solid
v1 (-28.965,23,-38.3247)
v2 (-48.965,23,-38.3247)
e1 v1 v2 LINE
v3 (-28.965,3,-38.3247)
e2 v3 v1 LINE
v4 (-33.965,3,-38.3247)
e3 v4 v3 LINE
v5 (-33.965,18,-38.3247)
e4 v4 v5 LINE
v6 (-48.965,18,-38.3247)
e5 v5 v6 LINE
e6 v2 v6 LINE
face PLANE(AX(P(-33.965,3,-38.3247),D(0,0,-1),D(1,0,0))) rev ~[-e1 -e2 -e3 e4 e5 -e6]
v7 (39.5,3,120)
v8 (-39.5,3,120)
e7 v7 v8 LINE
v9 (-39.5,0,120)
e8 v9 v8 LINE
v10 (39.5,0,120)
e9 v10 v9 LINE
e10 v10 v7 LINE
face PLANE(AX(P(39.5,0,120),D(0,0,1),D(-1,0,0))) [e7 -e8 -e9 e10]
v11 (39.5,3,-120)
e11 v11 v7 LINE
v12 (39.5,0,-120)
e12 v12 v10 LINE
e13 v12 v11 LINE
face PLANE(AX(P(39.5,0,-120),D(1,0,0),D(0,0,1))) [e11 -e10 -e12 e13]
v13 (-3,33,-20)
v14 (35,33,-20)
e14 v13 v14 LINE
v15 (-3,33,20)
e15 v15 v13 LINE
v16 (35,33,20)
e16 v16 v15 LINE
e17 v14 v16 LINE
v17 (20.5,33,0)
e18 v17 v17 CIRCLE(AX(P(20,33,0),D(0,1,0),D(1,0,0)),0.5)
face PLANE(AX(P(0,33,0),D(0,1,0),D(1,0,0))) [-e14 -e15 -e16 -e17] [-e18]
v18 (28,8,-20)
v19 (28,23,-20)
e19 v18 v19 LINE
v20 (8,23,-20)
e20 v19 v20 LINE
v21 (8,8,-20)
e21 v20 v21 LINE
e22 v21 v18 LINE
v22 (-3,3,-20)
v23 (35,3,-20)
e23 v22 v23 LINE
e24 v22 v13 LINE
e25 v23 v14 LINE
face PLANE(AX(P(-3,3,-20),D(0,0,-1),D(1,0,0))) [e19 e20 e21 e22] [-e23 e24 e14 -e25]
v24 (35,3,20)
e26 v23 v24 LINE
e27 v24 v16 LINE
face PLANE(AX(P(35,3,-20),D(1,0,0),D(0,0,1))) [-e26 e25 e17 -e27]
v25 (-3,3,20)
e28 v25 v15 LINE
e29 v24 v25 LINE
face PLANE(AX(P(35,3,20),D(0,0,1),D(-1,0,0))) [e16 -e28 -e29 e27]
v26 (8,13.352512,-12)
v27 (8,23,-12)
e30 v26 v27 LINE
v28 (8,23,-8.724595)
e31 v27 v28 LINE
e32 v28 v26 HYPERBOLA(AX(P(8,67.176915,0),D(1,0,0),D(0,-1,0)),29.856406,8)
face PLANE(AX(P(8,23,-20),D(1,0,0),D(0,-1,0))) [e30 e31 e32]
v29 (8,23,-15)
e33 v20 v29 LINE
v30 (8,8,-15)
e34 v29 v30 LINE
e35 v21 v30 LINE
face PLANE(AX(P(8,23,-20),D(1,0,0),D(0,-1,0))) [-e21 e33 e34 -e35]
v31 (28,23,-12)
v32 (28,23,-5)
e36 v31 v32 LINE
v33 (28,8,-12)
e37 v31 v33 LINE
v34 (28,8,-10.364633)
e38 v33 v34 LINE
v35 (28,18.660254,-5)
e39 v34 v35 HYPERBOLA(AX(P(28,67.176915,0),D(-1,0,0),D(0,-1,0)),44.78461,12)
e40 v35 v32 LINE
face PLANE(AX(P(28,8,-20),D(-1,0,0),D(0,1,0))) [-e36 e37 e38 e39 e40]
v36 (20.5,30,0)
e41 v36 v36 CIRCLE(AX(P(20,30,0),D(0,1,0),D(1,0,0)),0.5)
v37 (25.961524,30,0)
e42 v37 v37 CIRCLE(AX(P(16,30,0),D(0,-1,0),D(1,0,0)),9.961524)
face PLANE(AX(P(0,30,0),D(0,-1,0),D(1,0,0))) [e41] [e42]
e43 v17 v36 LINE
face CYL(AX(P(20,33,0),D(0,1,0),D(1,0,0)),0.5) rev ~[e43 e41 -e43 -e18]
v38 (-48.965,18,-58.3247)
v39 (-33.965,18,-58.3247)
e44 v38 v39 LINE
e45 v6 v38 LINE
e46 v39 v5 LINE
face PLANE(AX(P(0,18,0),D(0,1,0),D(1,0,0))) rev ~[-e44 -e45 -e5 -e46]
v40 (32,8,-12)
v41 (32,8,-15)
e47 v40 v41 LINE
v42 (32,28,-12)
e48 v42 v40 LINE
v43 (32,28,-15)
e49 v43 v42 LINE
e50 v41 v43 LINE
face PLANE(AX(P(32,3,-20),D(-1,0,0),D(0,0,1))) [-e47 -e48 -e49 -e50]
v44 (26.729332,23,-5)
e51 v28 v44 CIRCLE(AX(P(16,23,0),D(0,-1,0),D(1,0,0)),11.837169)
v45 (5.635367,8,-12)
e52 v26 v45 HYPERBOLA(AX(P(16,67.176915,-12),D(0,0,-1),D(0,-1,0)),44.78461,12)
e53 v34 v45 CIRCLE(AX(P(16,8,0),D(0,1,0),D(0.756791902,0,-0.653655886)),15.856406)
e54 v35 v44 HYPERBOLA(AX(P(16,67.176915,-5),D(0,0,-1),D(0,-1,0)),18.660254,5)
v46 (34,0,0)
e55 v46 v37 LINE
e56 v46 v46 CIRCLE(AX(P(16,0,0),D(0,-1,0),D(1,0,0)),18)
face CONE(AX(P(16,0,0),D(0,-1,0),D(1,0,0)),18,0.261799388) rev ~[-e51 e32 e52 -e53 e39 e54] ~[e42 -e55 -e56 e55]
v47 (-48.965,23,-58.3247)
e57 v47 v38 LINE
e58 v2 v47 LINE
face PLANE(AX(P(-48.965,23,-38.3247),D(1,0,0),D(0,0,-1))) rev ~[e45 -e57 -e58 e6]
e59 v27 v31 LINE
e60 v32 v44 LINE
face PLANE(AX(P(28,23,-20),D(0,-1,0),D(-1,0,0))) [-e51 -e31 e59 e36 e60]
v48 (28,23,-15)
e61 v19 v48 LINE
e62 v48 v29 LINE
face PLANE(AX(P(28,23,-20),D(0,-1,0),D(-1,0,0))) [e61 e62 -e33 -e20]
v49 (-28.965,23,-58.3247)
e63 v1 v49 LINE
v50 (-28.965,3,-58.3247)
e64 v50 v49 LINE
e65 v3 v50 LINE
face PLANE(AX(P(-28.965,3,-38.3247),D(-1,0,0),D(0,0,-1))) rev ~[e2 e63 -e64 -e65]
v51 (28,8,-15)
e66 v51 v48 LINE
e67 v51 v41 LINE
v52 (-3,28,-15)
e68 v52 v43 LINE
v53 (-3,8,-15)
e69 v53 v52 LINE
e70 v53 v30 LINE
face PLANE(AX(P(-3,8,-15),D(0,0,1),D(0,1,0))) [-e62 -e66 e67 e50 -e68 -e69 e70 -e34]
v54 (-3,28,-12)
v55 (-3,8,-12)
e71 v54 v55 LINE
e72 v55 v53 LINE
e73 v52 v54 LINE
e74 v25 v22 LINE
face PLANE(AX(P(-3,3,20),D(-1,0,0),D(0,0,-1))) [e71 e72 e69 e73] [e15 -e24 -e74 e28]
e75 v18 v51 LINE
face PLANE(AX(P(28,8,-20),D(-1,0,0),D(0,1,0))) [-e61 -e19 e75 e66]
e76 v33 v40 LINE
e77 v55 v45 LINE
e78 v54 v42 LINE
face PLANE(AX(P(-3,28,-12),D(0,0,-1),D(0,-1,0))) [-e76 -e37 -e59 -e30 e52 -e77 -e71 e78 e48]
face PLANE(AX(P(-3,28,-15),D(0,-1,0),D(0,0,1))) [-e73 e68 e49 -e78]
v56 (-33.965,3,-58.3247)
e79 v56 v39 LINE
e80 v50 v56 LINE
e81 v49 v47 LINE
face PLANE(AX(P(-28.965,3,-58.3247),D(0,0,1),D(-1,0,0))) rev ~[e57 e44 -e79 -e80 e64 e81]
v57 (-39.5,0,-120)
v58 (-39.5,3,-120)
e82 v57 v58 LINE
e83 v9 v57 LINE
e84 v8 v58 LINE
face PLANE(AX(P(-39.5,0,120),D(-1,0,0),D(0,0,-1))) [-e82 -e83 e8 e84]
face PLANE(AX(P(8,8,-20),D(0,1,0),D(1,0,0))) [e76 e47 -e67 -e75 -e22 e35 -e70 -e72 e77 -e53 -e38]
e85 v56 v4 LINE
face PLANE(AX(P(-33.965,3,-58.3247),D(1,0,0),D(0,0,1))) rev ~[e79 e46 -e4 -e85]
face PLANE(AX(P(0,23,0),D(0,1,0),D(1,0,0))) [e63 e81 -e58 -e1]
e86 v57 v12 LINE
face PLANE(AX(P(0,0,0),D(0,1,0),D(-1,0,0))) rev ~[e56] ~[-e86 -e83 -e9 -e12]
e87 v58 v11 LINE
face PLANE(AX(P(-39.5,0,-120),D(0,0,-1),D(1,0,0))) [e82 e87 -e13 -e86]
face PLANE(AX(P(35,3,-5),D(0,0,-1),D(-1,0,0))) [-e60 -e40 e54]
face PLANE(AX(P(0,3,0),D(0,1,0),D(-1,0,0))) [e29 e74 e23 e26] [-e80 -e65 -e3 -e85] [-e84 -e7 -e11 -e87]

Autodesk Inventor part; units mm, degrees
ref_plane "YZ Plane" through (0, 0, 0) normal (1, 0, 0) x (0, 1, 0)
ref_plane "XZ Plane" through (0, 0, 0) normal (0, 1, 0) x (-1, 0, 0)
ref_plane "XY Plane" through (0, 0, 0) normal (0, 0, 1) x (1, 0, 0)
sketch "Sketch44" plane through (0, 0, 0) normal (0, 1, 0) x (-1, 0, 0)
  line L0 (-39.5, 120) -> (39.5, 120)
  line L1 (39.5, 120) -> (39.5, -120)
  line L2 (39.5, -120) -> (-39.5, -120)
  line L3 (-39.5, -120) -> (-39.5, 120)
  line L4 (-39.5, 120) -> (39.5, -120) construction
  line L5 (39.5, 120) -> (-39.5, -120) construction
  point P0 (0, 0)
  dimension "d138" = 79
  dimension "d139" = 240
extrude "Extrusion33" add sketch "Sketch44" along normal blind 3
sketch "Sketch45" plane through (0, 3, 0) normal (0, 1, 0) x (1, 0, 0)
  line L0 (35, -20) -> (-3, -20)
  line L1 (-3, -20) -> (-3, 20)
  line L2 (-3, 20) -> (35, 20)
  line L3 (35, 20) -> (35, -20)
  point P0 (0, 0)
  dimension "d142" = 38
  dimension "d143" = 40
extrude "Extrusion34" add sketch "Sketch45" along normal blind 30
sketch "Sketch46" plane through (0, 33, 0) normal (0, 1, 0) x (1, 0, 0)
  point P0 (0, 0)
sketch "Sketch47" plane through (0, 0, 0) normal (0, -1, 0) x (1, 0, 0)
  circle A0 centre (16, 0) radius 18
  point P0 (0, 0)
  dimension "d146" = 36
extrude "Extrusion35" cut sketch "Sketch47" against normal blind 30 draft -15
sketch "Sketch48" plane through (0, 33, 0) normal (0, 1, 0) x (1, 0, 0)
  point P0 (0, 0)
sketch "Sketch49" plane through (0, 33, 0) normal (0, 1, 0) x (1, 0, 0)
  circle A0 centre (20, 0) radius 0.5
  point P0 (0, 0)
  dimension "d149" = 1
extrude "Extrusion36" cut sketch "Sketch49" against normal through all
sketch "Sketch58" plane through (35, 3, -20) normal (0, 0, -1) x (-1, 0, 0)
  line L0 (7, 20) -> (27, 20)
  line L1 (27, 20) -> (27, 5)
  line L2 (27, 5) -> (7, 5)
  line L3 (7, 5) -> (7, 20)
  point P0 (35, -3)
  dimension "d156" = 20
  dimension "d157" = 15
extrude "Extrusion38" cut sketch "Sketch58" against normal blind 15
sketch "Sketch59" plane through (-3, 3, -20) normal (-1, 0, 0) x (0, 0, 1)
  line L0 (5, 25) -> (8, 25)
  line L1 (8, 25) -> (8, 5)
  line L2 (8, 5) -> (5, 5)
  line L3 (5, 5) -> (5, 25)
  point P0 (20, -3)
  dimension "d160" = 3
  dimension "d161" = 20
extrude "Extrusion39" cut sketch "Sketch59" against normal blind 35
sketch "Sketch60" plane through (0, 3, 0) normal (0, 1, 0) x (1, 0, 0)
  line L0 (-33.965, 38.3247) -> (-28.965, 38.3247)
  line L1 (-28.965, 38.3247) -> (-28.965, 58.3247)
  line L2 (-28.965, 58.3247) -> (-33.965, 58.3247)
  line L3 (-33.965, 58.3247) -> (-33.965, 38.3247)
  point P0 (0, 0)
  dimension "d164" = 5
  dimension "d165" = 20
extrude "Extrusion40" add sketch "Sketch60" along normal blind 20
sketch "Sketch61" plane through (0, 23, 0) normal (0, 1, 0) x (1, 0, 0)
  line L0 (-28.965, 38.3247) -> (-28.965, 58.3247) projected
  line L1 (-28.965, 38.3247) -> (-48.965, 38.3247)
  line L2 (-48.965, 38.3247) -> (-48.965, 58.3247)
  line L3 (-48.965, 58.3247) -> (-28.965, 58.3247)
  line L4 (-28.965, 58.3247) -> (-28.965, 38.3247)
  point P0 (0, 0)
  dimension "d168" = 20
  dimension "d169" = 20
extrude "Extrusion41" add sketch "Sketch61" against normal blind 5
properties part number "liquid port_v01"
